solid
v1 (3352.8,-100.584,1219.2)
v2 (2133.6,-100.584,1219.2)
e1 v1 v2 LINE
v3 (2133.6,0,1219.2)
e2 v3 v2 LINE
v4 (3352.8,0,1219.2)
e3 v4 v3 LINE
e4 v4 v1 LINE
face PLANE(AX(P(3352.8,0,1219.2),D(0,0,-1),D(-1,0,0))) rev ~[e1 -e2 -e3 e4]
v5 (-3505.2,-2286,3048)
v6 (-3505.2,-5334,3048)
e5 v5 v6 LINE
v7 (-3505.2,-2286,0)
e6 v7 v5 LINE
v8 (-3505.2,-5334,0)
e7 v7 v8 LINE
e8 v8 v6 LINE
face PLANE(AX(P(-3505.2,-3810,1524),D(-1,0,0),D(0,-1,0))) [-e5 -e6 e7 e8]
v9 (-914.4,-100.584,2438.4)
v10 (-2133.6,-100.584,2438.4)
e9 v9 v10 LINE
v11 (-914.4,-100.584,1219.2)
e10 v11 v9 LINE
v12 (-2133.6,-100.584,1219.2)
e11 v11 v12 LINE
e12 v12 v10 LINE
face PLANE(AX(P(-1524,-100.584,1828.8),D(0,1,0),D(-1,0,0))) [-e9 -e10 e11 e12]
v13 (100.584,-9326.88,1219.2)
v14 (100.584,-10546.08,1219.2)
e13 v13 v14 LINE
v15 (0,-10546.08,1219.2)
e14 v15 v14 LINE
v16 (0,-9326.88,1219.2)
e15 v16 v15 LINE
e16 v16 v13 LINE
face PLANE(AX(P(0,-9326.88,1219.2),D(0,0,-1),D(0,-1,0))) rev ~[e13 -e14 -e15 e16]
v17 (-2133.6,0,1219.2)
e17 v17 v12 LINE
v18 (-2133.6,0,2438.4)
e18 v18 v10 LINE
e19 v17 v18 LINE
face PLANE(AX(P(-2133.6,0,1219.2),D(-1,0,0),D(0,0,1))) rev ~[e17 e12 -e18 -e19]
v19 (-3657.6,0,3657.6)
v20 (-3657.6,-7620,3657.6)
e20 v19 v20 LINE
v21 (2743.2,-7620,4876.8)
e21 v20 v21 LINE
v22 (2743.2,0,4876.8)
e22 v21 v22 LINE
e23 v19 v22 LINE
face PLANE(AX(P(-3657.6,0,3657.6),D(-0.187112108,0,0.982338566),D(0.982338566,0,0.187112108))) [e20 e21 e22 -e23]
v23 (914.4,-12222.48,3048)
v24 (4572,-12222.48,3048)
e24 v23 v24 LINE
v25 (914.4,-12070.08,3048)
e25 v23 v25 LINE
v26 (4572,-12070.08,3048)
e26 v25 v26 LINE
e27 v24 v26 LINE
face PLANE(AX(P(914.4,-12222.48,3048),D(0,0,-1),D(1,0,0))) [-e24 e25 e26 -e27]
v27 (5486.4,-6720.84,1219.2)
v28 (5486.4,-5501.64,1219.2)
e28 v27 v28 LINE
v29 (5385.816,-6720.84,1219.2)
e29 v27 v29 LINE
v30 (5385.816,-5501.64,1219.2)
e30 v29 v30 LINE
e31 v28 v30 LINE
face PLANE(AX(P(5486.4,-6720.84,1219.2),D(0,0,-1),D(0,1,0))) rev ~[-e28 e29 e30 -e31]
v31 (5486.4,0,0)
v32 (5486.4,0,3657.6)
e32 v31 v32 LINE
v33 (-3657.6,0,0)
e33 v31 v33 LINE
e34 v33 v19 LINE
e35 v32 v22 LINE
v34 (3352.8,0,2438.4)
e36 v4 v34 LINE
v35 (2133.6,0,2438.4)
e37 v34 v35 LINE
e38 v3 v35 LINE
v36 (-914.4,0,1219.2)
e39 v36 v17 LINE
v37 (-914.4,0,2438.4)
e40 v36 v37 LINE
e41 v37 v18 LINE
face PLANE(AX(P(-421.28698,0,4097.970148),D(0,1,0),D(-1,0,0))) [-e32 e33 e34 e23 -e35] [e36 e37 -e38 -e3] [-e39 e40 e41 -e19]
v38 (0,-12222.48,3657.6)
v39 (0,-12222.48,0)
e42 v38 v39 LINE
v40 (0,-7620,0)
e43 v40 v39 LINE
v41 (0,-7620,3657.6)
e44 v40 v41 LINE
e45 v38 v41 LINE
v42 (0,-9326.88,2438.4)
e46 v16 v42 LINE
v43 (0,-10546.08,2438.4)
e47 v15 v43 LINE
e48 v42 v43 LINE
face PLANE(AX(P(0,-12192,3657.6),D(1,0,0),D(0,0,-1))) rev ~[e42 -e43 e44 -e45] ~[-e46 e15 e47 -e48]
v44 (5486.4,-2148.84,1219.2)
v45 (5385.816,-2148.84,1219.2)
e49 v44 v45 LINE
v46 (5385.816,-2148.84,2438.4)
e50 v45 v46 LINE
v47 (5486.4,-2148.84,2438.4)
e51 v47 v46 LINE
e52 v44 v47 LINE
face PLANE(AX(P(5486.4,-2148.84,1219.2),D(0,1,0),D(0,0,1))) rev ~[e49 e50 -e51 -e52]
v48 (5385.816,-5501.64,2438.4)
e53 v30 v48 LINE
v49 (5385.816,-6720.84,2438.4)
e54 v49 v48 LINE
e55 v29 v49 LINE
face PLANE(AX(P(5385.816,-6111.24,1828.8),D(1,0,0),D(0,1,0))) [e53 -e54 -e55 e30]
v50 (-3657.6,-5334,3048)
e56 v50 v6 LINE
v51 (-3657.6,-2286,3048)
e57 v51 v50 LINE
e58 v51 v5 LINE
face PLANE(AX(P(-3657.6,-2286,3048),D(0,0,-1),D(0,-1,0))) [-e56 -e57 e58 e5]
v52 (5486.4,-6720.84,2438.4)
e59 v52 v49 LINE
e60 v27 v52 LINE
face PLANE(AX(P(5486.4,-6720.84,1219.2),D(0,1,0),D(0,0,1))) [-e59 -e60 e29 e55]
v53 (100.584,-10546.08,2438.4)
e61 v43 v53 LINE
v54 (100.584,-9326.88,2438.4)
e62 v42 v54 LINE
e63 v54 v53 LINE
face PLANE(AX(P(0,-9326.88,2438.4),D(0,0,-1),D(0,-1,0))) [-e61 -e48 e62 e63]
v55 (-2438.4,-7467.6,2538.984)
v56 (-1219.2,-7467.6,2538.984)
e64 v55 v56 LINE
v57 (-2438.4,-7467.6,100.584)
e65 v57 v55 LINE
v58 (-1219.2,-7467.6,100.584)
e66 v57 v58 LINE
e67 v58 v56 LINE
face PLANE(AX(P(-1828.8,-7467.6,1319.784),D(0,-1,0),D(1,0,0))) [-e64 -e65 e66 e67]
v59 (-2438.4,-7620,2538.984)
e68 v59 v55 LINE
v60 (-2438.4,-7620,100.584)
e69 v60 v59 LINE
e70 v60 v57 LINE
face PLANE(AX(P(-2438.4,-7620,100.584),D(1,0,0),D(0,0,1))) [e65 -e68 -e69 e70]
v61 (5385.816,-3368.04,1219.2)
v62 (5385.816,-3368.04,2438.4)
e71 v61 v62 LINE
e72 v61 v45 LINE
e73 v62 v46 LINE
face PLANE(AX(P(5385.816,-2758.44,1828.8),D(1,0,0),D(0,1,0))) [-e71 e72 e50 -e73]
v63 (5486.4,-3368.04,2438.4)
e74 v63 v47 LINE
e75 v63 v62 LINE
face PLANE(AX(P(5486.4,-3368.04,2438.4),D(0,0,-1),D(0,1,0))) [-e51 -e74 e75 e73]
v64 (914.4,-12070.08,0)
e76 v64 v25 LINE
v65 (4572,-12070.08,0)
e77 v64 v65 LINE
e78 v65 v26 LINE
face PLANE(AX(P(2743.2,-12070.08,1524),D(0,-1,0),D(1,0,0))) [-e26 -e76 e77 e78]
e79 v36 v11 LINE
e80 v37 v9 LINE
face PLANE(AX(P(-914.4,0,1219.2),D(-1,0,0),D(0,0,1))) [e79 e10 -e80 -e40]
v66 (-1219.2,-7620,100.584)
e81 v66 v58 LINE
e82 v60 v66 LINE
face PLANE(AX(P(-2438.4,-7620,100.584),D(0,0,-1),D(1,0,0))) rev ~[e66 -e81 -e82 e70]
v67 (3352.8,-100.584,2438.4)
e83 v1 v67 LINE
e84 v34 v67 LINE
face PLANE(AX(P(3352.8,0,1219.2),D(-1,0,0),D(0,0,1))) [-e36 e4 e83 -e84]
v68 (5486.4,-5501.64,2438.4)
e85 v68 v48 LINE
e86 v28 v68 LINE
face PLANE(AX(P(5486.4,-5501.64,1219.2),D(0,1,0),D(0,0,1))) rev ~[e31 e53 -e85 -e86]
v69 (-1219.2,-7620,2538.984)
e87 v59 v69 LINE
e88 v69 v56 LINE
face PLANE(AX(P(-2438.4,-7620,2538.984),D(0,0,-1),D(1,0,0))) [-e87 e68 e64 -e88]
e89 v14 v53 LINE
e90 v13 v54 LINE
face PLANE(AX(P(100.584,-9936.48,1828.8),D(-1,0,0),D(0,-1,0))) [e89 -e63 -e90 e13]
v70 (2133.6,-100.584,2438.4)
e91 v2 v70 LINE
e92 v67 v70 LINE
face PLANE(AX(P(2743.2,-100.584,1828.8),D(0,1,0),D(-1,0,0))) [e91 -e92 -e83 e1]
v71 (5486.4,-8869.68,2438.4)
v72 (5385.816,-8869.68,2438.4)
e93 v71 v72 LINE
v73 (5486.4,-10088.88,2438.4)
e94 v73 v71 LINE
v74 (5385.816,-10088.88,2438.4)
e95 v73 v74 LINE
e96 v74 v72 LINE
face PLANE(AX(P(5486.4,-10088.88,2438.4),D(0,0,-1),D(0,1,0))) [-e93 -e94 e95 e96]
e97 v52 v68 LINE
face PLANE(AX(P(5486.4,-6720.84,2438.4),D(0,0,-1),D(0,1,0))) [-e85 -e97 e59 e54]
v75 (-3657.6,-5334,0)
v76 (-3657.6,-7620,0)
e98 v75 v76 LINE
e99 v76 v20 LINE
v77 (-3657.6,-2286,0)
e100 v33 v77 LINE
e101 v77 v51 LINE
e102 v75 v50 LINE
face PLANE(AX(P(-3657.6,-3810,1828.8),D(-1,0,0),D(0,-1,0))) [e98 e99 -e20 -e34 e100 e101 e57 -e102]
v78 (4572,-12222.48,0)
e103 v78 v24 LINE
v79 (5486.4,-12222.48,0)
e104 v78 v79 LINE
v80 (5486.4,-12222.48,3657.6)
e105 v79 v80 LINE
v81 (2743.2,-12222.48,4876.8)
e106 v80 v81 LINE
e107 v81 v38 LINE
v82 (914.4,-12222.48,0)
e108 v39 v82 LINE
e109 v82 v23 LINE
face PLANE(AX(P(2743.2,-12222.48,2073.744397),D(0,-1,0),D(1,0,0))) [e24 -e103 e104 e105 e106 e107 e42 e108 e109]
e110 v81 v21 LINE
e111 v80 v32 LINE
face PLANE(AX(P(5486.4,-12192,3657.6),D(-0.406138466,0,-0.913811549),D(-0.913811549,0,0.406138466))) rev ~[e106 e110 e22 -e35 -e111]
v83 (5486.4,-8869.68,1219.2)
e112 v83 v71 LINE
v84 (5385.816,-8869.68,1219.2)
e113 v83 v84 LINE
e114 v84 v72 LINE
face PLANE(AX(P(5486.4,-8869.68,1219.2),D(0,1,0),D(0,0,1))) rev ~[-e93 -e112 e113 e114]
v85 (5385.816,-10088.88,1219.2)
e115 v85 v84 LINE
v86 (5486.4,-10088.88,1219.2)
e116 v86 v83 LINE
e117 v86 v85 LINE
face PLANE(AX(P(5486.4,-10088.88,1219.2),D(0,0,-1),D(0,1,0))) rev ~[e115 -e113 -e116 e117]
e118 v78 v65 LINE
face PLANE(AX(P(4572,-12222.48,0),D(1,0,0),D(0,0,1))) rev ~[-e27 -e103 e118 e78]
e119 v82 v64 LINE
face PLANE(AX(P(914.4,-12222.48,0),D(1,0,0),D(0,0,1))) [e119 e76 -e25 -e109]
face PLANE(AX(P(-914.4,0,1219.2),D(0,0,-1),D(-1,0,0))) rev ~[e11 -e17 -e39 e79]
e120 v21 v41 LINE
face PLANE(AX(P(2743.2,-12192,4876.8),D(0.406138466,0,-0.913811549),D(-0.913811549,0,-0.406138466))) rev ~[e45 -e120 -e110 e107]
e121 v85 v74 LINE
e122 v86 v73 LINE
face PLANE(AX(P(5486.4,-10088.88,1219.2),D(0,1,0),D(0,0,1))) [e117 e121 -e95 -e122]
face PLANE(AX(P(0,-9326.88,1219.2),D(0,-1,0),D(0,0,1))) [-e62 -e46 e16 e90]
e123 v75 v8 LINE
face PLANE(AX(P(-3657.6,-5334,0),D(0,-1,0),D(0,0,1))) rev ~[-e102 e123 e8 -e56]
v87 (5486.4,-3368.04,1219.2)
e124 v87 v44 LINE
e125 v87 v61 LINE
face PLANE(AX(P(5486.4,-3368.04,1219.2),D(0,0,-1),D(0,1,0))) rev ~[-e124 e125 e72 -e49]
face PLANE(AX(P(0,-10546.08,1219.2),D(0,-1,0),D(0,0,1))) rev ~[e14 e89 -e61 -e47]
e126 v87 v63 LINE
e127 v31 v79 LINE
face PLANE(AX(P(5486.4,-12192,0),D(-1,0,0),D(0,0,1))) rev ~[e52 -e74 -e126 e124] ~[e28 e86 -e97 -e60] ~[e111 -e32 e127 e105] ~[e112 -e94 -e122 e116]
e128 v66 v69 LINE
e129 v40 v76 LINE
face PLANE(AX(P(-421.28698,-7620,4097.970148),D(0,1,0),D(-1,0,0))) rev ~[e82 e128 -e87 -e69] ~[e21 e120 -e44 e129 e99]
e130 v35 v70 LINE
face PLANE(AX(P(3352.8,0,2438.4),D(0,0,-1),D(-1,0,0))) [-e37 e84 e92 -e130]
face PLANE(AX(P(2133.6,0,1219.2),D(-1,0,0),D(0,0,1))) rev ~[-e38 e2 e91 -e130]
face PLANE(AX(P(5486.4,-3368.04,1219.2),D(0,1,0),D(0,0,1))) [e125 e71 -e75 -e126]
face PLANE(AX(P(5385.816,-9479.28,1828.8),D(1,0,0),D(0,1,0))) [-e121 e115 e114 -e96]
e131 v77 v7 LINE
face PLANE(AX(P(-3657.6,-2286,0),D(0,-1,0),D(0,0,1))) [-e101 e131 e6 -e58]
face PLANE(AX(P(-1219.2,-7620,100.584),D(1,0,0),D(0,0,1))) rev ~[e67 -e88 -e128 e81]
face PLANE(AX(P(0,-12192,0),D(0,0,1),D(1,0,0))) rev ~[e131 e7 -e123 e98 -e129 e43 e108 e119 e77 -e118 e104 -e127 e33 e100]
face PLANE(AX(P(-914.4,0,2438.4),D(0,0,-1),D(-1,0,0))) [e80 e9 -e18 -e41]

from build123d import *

# Parameters (mm, degrees)
F1_DEPTH      = 12192
F2_W          = 7620
F2_H          = 3657.6
F3_DEPTH      = 3657.6
F3_DEPTH_BACK = 2743.2
F4_DEPTH      = 30.48
F5_W          = 3657.6
F5_H          = 3048
F6_DEPTH      = 152.4
F7_W          = 3048
F7_H          = 3048
F8_DEPTH      = 152.4
F9_W          = 1219.2
F9_H          = 2438.4
F10_DEPTH     = 152.4
F11_W         = 1219.2
F11_H         = 1219.2
F12_DEPTH     = 100.584
F13_W         = 1219.2
F13_H         = 1219.2
F14_DEPTH     = 100.584
F15_W         = 1219.2
F15_H         = 1219.2
F16_DEPTH     = 100.584
F18_DEPTH     = 7620


with BuildPart() as f1:
    # F0 (on Front) → F1 (new body)
    with BuildSketch(Plane.XZ):
        Polygon((0, 3657.6), (0, 0), (5486.4, 0), (5486.4, 3657.6), (2743.2, 4876.8), align=None)
    extrude(amount=F1_DEPTH)

    # F2 (on face) → F3 (join, two sides)
    with BuildSketch(Plane(origin=(0, 0, 0), x_dir=(0, -1, 0), z_dir=(-1, 0, 0))) as f3_sk:
        with Locations((3810, 1828.8)):
            Rectangle(F2_W, F2_H)
    extrude(amount=F3_DEPTH)
    extrude(f3_sk.sketch, amount=-F3_DEPTH_BACK)

    # F4 (add): a face of the model
    f4_faces = [f1.faces().sort_by_distance(p)[0] for p in [
        (2743.2, -12192, 2148.1142857143),
    ]]
    extrude(f4_faces, amount=F4_DEPTH)

    # F5 (on face) → F6 (cut)
    with BuildSketch(Plane.XZ.offset(12222.48)):
        with Locations((2743.2, 1524)):
            Rectangle(F5_W, F5_H)
    extrude(amount=-F6_DEPTH, mode=Mode.SUBTRACT)

    # F7 (on face) → F8 (cut)
    with BuildSketch(Plane(origin=(-3657.6, 0, 0), x_dir=(0, -1, 0), z_dir=(-1, 0, 0))):
        with Locations((3810, 1524)):
            Rectangle(F7_W, F7_H)
    extrude(amount=-F8_DEPTH, mode=Mode.SUBTRACT)

    # F9 (on face) → F10 (cut)
    with BuildSketch(Plane.XZ.offset(7620)):
        with Locations((-1828.8, 1319.784)):
            Rectangle(F9_W, F9_H)
    extrude(amount=-F10_DEPTH, mode=Mode.SUBTRACT)

    # F11 (on face) → F12 (cut)
    with BuildSketch(Plane.YZ.offset(5486.4)):
        with Locations((-9479.28, 1828.8)):
            Rectangle(F11_W, F11_H)
        with Locations((-6111.24, 1828.8)):
            Rectangle(F11_W, F11_H)
        with Locations((-2758.44, 1828.8)):
            Rectangle(F11_W, F11_H)
    extrude(amount=-F12_DEPTH, mode=Mode.SUBTRACT)

    # F13 (on face) → F14 (cut)
    with BuildSketch(Plane(origin=(0, 0, 0), x_dir=(-1, 0, 0), z_dir=(0, 1, 0))):
        with Locations((-2743.2, 1828.8)):
            Rectangle(F13_W, F13_H)
        with Locations((1524, 1828.8)):
            Rectangle(F13_W, F13_H)
    extrude(amount=-F14_DEPTH, mode=Mode.SUBTRACT)

    # F15 (on face) → F16 (cut)
    with BuildSketch(Plane(origin=(0, 0, 0), x_dir=(0, -1, 0), z_dir=(-1, 0, 0))):
        with Locations((9936.48, 1828.8)):
            Rectangle(F15_W, F15_H)
    extrude(amount=-F16_DEPTH, mode=Mode.SUBTRACT)

    # F17 (on face) → F18 (join)
    with BuildSketch(Plane(origin=(0, 0, 0), x_dir=(-1, 0, 0), z_dir=(0, 1, 0))):
        Polygon((3657.6, 3657.6), (-2743.2, 4876.8), (0, 3657.6), align=None)
    extrude(amount=-F18_DEPTH)


solid = f1.part
